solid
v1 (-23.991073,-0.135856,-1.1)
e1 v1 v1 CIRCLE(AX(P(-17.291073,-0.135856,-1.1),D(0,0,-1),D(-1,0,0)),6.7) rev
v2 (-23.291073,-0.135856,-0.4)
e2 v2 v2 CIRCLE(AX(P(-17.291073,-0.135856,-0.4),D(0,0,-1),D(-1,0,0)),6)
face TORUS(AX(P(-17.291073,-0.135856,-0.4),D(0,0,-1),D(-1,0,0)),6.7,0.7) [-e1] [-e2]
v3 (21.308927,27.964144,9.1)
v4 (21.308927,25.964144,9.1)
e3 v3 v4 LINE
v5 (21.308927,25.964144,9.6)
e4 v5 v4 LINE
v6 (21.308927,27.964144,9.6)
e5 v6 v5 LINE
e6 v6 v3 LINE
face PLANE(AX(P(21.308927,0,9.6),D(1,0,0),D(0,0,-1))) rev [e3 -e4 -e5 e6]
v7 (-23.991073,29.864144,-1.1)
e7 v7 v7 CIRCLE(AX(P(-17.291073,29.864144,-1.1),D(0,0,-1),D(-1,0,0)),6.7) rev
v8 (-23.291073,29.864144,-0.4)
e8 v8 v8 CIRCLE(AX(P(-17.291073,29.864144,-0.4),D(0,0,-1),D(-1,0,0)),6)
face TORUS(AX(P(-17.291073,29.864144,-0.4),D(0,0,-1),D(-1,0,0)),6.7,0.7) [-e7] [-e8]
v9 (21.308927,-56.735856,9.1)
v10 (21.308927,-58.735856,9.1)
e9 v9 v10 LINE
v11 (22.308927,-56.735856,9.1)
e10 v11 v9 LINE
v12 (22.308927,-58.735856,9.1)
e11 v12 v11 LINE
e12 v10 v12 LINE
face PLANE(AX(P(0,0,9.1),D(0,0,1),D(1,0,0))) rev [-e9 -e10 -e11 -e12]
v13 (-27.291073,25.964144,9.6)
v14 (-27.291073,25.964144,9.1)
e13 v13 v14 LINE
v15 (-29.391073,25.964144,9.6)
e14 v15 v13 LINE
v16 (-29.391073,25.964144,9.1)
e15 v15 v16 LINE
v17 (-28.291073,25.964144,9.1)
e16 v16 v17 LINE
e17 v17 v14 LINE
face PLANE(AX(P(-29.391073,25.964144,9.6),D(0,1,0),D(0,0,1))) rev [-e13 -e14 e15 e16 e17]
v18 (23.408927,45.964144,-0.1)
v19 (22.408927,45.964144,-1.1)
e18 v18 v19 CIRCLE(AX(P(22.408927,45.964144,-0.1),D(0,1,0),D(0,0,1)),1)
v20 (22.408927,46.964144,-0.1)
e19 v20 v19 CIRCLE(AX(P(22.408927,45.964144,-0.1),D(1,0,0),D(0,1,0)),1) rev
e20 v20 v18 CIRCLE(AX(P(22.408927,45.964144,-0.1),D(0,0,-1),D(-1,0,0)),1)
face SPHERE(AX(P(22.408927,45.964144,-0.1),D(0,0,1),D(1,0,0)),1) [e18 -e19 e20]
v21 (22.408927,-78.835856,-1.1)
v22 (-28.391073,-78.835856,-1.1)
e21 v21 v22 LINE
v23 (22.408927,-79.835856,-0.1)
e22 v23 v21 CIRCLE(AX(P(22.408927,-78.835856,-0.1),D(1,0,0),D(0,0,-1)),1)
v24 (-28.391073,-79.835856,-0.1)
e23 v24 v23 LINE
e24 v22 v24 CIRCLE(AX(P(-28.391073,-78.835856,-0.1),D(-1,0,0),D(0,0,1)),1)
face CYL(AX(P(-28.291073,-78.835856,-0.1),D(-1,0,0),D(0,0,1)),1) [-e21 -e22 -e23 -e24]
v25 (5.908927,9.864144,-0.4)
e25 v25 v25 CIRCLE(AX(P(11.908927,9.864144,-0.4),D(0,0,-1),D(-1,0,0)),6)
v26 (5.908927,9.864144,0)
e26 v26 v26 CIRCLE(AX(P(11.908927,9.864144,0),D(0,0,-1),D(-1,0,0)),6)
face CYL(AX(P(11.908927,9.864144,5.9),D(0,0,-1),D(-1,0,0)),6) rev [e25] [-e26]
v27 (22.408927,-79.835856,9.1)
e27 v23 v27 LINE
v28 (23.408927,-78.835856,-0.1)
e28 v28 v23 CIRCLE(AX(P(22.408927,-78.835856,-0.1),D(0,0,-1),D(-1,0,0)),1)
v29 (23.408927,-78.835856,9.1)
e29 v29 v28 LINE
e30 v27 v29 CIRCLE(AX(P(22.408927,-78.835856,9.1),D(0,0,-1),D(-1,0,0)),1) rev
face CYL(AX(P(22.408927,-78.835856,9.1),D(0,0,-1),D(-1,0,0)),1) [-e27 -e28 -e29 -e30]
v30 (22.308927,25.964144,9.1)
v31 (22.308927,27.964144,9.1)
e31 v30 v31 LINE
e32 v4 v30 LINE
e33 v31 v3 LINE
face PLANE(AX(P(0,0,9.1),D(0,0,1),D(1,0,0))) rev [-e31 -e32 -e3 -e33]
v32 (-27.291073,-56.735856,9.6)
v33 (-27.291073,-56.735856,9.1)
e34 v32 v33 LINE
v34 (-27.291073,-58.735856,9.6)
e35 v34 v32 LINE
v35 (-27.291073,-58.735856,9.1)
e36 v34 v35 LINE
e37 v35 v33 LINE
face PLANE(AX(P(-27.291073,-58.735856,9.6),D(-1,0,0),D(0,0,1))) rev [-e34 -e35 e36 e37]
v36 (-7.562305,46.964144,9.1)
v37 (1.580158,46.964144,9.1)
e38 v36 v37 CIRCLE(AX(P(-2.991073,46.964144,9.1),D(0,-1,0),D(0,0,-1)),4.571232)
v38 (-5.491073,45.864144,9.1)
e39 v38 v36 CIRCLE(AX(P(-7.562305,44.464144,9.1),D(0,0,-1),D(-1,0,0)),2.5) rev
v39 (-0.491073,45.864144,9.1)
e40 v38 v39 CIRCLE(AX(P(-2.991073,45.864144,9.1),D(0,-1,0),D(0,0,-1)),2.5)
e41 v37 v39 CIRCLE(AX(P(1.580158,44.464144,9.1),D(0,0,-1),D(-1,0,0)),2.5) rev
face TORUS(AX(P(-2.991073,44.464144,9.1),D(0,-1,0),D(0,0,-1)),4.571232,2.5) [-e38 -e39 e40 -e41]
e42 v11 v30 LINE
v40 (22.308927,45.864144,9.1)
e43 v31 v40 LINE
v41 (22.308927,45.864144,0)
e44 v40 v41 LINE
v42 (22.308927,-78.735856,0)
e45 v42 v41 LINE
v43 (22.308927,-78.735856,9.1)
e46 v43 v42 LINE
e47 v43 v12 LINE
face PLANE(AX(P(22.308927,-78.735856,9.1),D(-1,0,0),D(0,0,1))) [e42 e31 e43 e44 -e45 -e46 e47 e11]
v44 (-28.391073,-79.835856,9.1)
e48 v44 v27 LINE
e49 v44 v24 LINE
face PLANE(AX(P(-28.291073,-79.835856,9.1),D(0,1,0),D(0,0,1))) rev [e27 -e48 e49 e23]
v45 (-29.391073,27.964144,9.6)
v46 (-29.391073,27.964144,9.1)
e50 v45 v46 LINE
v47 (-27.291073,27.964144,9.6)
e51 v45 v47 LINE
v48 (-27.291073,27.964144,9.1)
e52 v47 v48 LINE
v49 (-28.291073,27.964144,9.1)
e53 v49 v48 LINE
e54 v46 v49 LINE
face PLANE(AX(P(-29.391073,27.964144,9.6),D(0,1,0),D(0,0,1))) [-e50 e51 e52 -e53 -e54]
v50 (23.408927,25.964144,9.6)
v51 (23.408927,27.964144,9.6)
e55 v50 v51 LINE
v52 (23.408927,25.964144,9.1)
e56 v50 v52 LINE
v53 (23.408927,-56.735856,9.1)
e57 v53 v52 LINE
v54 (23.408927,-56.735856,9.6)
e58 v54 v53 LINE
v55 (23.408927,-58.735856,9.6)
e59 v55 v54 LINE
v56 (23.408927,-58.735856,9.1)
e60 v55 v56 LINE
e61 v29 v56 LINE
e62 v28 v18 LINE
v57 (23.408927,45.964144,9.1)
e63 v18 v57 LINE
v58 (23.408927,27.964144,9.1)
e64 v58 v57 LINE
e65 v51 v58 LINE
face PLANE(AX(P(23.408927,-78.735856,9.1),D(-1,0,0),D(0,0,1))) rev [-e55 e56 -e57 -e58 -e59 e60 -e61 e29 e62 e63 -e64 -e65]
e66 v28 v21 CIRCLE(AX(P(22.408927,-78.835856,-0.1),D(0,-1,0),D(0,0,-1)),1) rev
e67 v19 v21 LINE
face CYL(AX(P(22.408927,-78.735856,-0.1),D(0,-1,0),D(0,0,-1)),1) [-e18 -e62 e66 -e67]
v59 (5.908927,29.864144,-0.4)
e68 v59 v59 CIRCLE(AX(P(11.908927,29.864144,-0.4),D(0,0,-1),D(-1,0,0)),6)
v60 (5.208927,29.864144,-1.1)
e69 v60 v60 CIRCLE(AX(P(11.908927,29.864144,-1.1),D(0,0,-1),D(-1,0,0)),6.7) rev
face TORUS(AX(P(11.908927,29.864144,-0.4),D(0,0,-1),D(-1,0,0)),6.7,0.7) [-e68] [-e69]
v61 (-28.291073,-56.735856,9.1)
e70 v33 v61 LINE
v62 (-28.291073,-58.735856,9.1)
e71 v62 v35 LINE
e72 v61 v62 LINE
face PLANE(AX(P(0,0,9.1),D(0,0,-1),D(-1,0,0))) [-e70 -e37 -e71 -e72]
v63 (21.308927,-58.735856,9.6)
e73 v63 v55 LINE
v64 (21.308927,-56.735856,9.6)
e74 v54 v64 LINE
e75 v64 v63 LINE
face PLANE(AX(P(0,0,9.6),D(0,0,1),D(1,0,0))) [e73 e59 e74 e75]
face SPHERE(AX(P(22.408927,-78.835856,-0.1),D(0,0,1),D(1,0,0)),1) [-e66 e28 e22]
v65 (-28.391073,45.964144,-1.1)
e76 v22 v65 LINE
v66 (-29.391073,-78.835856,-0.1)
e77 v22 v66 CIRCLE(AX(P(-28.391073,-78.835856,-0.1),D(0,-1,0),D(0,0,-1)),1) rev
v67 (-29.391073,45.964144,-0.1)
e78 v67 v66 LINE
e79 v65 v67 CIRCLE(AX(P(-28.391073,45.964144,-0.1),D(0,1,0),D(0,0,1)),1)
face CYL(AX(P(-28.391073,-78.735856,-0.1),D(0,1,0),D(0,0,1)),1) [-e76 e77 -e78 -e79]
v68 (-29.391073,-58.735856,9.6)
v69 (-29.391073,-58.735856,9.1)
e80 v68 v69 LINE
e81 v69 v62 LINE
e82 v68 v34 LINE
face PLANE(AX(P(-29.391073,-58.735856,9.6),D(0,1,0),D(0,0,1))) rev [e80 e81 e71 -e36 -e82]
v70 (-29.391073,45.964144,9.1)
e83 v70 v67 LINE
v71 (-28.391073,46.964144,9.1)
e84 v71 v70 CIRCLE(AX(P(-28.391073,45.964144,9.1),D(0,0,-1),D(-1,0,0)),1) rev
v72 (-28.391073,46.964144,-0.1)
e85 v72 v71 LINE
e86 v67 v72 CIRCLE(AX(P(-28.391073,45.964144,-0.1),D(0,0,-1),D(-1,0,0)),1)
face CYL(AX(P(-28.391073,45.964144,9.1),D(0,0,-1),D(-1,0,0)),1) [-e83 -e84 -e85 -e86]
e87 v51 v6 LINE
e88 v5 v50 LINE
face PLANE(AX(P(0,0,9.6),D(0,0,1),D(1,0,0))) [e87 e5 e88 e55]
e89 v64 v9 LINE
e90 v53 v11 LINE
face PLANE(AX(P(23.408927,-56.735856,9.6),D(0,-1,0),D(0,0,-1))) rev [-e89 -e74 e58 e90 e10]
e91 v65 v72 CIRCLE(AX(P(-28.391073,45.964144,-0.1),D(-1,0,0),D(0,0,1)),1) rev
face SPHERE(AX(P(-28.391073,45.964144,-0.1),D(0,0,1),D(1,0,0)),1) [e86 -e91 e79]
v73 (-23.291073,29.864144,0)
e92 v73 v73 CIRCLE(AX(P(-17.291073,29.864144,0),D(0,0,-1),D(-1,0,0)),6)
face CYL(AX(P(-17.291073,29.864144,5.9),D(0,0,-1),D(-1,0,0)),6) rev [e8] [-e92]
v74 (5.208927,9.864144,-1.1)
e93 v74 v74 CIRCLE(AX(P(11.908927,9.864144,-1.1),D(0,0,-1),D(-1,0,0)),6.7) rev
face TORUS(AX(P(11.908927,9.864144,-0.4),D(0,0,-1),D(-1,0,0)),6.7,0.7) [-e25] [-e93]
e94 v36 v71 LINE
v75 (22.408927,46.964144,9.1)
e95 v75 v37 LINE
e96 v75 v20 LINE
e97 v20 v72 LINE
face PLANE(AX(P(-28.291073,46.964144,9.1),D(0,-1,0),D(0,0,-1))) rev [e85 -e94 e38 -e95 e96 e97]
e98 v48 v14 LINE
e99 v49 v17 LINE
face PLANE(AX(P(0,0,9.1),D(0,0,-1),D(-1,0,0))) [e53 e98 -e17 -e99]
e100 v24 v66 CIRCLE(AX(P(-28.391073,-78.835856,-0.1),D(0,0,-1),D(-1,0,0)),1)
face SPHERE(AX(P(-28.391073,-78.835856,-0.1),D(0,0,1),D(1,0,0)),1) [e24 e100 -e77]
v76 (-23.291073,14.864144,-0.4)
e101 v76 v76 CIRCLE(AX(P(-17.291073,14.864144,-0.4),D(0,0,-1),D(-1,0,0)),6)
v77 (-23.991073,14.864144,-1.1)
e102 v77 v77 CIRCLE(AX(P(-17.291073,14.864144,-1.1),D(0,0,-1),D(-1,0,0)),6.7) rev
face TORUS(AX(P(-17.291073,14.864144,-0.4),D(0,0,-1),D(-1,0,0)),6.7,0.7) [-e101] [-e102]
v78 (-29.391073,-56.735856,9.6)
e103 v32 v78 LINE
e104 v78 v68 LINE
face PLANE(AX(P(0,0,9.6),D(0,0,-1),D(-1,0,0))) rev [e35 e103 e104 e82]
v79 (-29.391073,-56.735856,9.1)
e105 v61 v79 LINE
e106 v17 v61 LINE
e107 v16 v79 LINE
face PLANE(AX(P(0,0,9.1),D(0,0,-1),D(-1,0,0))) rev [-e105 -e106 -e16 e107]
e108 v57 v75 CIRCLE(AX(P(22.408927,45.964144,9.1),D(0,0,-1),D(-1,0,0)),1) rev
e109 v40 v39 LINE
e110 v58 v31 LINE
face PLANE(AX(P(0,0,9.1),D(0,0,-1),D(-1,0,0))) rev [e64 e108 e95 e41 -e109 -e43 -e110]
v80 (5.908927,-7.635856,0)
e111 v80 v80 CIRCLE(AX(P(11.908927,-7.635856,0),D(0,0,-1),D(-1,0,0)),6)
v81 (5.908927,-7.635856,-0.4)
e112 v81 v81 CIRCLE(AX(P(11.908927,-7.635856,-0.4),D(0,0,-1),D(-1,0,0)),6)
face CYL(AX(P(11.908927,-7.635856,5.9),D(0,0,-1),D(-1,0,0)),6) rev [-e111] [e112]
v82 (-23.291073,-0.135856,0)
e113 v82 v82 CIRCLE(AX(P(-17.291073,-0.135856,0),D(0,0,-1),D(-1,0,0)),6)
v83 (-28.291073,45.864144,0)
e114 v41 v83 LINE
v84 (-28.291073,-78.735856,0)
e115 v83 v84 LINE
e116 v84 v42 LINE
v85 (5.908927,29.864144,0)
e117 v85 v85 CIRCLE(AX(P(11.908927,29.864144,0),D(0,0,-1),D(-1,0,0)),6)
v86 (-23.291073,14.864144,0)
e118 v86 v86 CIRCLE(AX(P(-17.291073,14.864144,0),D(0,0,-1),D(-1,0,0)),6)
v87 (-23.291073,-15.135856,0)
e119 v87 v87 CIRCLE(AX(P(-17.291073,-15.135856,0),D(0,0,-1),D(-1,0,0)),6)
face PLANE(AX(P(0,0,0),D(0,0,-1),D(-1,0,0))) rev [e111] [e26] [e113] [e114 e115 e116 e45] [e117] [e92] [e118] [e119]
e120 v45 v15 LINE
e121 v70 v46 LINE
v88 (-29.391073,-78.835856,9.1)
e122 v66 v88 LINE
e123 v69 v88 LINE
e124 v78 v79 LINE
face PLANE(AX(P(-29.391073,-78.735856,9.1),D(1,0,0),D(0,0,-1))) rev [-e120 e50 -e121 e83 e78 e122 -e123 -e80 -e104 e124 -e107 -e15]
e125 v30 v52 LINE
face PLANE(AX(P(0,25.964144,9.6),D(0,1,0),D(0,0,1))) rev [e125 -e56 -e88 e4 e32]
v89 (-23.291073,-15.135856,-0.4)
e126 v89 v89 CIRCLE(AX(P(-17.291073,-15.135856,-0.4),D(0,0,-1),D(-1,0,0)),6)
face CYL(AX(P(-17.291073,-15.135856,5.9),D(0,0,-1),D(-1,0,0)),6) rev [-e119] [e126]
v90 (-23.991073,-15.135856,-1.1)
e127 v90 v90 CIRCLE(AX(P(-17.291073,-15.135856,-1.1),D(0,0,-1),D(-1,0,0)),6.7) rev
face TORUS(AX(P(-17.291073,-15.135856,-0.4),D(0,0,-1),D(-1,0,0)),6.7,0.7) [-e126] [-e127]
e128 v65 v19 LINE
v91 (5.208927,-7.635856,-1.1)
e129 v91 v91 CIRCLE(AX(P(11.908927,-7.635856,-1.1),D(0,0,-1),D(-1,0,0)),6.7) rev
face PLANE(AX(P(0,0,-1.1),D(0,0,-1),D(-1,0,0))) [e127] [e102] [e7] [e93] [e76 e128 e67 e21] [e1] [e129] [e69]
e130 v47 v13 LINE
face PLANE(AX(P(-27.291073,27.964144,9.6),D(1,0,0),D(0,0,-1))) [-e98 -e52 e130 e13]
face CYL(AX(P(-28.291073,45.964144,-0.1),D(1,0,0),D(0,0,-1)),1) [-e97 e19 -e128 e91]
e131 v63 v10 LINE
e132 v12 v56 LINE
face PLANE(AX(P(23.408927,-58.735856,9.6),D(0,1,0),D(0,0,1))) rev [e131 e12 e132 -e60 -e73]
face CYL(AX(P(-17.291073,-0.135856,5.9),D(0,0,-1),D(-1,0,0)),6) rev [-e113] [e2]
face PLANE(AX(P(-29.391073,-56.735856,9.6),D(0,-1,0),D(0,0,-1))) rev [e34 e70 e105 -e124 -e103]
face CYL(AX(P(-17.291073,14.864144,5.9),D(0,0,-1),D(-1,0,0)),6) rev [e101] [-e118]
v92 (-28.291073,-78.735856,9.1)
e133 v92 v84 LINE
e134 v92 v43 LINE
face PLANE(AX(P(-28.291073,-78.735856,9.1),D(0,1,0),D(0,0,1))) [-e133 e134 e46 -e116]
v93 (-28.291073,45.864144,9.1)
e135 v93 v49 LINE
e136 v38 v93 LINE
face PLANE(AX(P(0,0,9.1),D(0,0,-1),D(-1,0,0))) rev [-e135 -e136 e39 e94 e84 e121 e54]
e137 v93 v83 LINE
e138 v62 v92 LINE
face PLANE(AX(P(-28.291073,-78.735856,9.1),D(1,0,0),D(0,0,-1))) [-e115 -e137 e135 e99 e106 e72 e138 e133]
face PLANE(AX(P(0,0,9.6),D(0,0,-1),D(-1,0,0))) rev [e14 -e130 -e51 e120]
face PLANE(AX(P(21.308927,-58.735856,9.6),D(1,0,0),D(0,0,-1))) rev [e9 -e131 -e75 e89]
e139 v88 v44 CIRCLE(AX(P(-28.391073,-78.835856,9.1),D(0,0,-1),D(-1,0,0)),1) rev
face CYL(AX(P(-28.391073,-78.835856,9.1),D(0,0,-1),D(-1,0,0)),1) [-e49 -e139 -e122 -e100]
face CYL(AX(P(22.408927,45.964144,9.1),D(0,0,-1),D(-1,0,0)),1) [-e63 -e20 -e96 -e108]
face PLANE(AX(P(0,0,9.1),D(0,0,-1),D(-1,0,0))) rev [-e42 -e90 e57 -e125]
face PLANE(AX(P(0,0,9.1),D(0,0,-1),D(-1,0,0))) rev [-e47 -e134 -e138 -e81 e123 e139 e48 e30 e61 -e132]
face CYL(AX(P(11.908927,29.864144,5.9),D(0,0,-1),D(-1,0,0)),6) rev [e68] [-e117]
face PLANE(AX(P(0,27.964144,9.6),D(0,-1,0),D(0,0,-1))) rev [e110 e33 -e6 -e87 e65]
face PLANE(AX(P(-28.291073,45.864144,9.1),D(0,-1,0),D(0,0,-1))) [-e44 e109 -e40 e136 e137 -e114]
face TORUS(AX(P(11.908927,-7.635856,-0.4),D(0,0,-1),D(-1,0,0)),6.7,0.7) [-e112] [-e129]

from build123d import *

# Parameters (mm, degrees)
ESQUISSE1_W                  = 50.6
ESQUISSE1_H                  = 124.6
BOSS_EXTRU_1_DEPTH           = 9.1
COQUE7_T                     = 1.1
ENL_V_MAT_EXTRU_2_DEPTH      = 131.47944353
ENL_V_MAT_EXTRU_2_DEPTH_BACK = 7
CONG_1_R                     = 2.5
ESQUISSE6_R                  = 6
ENL_V_MAT_EXTRU_12_DEPTH     = 7
CONG_2_R                     = 0.7
CONG_3_R                     = 1
ESQUISSE8_W                  = 1.1
ESQUISSE8_H                  = 2
ESQUISSE8_W_2                = 1
ESQUISSE8_W_3                = 2.1
BOSS_EXTRU_3_DEPTH           = 0.5
ESQUISSE9_W                  = 2.1
ESQUISSE9_H                  = 2
BOSS_EXTRU_4_DEPTH           = 0.5


with BuildPart() as part:
    # Esquisse1 → Boss.-Extru.1 (new body)
    with BuildSketch(Plane.XY):
        with Locations((-2.991073199, -16.435856056)):
            Rectangle(ESQUISSE1_W, ESQUISSE1_H)
    extrude(amount=BOSS_EXTRU_1_DEPTH)

    # Coque7
    coque7_openings = [part.faces().sort_by_distance(p)[0] for p in [
        (-2.991073199, -16.435856056, 9.1),
    ]]
    offset(amount=COQUE7_T, openings=coque7_openings, kind=Kind.INTERSECTION)

    # Esquisse4 → Enlèv. mat.-Extru.2 (cut, two sides: drawn at the far end of the back side and taken through both)
    with BuildSketch(Plane(origin=(0, 46.964143944, 0), x_dir=(1, 0, 0), z_dir=(0, 1, 0)).offset(-ENL_V_MAT_EXTRU_2_DEPTH_BACK)):
        with BuildLine():
            Line((-5.491073199, -80.394371683), (-5.491073199, -9.1))
            ThreePointArc((-5.491073199, -9.1), (-2.991073199, -6.6), (-0.491073199, -9.1))
            Line((-0.491073199, -9.1), (-0.491073199, -80.394371683))
            Line((-0.491073199, -80.394371683), (-0.491073199, -222.983115049))
            Line((-0.491073199, -222.983115049), (-5.491073199, -222.983115049))
            Line((-5.491073199, -222.983115049), (-5.491073199, -80.394371683))
        make_face()
    extrude(amount=ENL_V_MAT_EXTRU_2_DEPTH + ENL_V_MAT_EXTRU_2_DEPTH_BACK, mode=Mode.SUBTRACT)

    # Congé1
    # the kernel refuses this fillet: 2.5 mm, written as the material it takes off along each edge
    with BuildSketch(Plane(origin=(-2.991073199, 46.964143944, 9.1), x_dir=(-0.0031415874858794265, 0, 0.9999950652018581), z_dir=(0.9999950652018581, 0, 0.0031415874858794265))) as cong_1_piece_1:
        with BuildLine():
            CenterArc((4.571231518, 2.5), CONG_1_R, 214.055797743, 55.944202257)
            Line((4.571231518, 0), (4.571231518, -0.05))
            Line((4.571231518, -0.05), (2.5, -0.05))
            Line((2.5, -0.05), (2.45, 0))
            ThreePointArc((2.45, 0), (2.45, 0.55), (2.45857537, 1.072))
            Line((2.45857537, 1.072), (2.5, 1.1))
        make_face()
    revolve(axis=Axis((-2.991073199, 46.964143944, 9.1), (0, -1, 0)), revolution_arc=359.64, mode=Mode.SUBTRACT)

    # Esquisse6 → Enlèv. mat.-Extru.12 (cut)
    with BuildSketch(Plane(origin=(0, 0, -1.1), x_dir=(-1, 0, 0), z_dir=(0, 0, -1))):
        with Locations((17.291073199, 14.864143944)):
            Circle(ESQUISSE6_R)
        with Locations((17.291073199, 29.864143944)):
            Circle(ESQUISSE6_R)
        with Locations((17.291073199, -0.135856056)):
            Circle(ESQUISSE6_R)
        with Locations((17.291073199, -15.135856056)):
            Circle(ESQUISSE6_R)
        with Locations((-11.908926801, 29.864143944)):
            Circle(ESQUISSE6_R)
        with Locations((-11.908926801, 9.864143944)):
            Circle(ESQUISSE6_R)
        with Locations((-11.908926801, -7.635856056)):
            Circle(ESQUISSE6_R)
    extrude(amount=-ENL_V_MAT_EXTRU_12_DEPTH, mode=Mode.SUBTRACT)

    # Congé2
    cong_2_edges = [part.edges().sort_by_distance(p)[0] for p in [
        (17.908926801, 29.864143944, -1.1),
        (-11.291073199, -15.135856056, -1.1),
        (-11.291073199, -0.135856056, -1.1),
        (-11.291073199, 29.864143944, -1.1),
        (17.908926801, 9.864143944, -1.1),
        (17.908926801, -7.635856056, -1.1),
        (-11.291073199, 14.864143944, -1.1),
    ]]
    fillet(cong_2_edges, radius=CONG_2_R)

    # Congé3
    cong_3_edges = [part.edges().sort_by_distance(p)[0] for p in [
        (-2.991073199, 46.964143944, -1.1),
        (23.408926801, -16.435856056, -1.1),
        (-2.991073199, -79.835856056, -1.1),
        (-29.391073199, -16.435856056, -1.1),
        (-29.391073199, 46.964143944, 4),
        (23.408926801, 46.964143944, 4),
        (23.408926801, -79.835856056, 4),
        (-29.391073199, -79.835856056, 4),
    ]]
    fillet(cong_3_edges, radius=CONG_3_R)

    # Esquisse8 → Boss.-Extru.3 (add)
    with BuildSketch(Plane.XY.offset(9.1)):
        with Locations((22.858926801, 26.964143944)):
            Rectangle(ESQUISSE8_W, ESQUISSE8_H)
        with Locations((21.808926801, 26.964143944)):
            Rectangle(ESQUISSE8_W_2, ESQUISSE8_H)
        with Locations((-28.341073199, 26.964143944)):
            Rectangle(ESQUISSE8_W_3, ESQUISSE8_H)
    extrude(amount=BOSS_EXTRU_3_DEPTH)

    # Esquisse9 → Boss.-Extru.4 (add)
    with BuildSketch(Plane.XY.offset(9.1)):
        with Locations((22.358926801, -57.735856056)):
            Rectangle(ESQUISSE9_W, ESQUISSE9_H)
        with Locations((-28.341073199, -57.735856056)):
            Rectangle(ESQUISSE9_W, ESQUISSE9_H)
    extrude(amount=BOSS_EXTRU_4_DEPTH)


solid = part.part
